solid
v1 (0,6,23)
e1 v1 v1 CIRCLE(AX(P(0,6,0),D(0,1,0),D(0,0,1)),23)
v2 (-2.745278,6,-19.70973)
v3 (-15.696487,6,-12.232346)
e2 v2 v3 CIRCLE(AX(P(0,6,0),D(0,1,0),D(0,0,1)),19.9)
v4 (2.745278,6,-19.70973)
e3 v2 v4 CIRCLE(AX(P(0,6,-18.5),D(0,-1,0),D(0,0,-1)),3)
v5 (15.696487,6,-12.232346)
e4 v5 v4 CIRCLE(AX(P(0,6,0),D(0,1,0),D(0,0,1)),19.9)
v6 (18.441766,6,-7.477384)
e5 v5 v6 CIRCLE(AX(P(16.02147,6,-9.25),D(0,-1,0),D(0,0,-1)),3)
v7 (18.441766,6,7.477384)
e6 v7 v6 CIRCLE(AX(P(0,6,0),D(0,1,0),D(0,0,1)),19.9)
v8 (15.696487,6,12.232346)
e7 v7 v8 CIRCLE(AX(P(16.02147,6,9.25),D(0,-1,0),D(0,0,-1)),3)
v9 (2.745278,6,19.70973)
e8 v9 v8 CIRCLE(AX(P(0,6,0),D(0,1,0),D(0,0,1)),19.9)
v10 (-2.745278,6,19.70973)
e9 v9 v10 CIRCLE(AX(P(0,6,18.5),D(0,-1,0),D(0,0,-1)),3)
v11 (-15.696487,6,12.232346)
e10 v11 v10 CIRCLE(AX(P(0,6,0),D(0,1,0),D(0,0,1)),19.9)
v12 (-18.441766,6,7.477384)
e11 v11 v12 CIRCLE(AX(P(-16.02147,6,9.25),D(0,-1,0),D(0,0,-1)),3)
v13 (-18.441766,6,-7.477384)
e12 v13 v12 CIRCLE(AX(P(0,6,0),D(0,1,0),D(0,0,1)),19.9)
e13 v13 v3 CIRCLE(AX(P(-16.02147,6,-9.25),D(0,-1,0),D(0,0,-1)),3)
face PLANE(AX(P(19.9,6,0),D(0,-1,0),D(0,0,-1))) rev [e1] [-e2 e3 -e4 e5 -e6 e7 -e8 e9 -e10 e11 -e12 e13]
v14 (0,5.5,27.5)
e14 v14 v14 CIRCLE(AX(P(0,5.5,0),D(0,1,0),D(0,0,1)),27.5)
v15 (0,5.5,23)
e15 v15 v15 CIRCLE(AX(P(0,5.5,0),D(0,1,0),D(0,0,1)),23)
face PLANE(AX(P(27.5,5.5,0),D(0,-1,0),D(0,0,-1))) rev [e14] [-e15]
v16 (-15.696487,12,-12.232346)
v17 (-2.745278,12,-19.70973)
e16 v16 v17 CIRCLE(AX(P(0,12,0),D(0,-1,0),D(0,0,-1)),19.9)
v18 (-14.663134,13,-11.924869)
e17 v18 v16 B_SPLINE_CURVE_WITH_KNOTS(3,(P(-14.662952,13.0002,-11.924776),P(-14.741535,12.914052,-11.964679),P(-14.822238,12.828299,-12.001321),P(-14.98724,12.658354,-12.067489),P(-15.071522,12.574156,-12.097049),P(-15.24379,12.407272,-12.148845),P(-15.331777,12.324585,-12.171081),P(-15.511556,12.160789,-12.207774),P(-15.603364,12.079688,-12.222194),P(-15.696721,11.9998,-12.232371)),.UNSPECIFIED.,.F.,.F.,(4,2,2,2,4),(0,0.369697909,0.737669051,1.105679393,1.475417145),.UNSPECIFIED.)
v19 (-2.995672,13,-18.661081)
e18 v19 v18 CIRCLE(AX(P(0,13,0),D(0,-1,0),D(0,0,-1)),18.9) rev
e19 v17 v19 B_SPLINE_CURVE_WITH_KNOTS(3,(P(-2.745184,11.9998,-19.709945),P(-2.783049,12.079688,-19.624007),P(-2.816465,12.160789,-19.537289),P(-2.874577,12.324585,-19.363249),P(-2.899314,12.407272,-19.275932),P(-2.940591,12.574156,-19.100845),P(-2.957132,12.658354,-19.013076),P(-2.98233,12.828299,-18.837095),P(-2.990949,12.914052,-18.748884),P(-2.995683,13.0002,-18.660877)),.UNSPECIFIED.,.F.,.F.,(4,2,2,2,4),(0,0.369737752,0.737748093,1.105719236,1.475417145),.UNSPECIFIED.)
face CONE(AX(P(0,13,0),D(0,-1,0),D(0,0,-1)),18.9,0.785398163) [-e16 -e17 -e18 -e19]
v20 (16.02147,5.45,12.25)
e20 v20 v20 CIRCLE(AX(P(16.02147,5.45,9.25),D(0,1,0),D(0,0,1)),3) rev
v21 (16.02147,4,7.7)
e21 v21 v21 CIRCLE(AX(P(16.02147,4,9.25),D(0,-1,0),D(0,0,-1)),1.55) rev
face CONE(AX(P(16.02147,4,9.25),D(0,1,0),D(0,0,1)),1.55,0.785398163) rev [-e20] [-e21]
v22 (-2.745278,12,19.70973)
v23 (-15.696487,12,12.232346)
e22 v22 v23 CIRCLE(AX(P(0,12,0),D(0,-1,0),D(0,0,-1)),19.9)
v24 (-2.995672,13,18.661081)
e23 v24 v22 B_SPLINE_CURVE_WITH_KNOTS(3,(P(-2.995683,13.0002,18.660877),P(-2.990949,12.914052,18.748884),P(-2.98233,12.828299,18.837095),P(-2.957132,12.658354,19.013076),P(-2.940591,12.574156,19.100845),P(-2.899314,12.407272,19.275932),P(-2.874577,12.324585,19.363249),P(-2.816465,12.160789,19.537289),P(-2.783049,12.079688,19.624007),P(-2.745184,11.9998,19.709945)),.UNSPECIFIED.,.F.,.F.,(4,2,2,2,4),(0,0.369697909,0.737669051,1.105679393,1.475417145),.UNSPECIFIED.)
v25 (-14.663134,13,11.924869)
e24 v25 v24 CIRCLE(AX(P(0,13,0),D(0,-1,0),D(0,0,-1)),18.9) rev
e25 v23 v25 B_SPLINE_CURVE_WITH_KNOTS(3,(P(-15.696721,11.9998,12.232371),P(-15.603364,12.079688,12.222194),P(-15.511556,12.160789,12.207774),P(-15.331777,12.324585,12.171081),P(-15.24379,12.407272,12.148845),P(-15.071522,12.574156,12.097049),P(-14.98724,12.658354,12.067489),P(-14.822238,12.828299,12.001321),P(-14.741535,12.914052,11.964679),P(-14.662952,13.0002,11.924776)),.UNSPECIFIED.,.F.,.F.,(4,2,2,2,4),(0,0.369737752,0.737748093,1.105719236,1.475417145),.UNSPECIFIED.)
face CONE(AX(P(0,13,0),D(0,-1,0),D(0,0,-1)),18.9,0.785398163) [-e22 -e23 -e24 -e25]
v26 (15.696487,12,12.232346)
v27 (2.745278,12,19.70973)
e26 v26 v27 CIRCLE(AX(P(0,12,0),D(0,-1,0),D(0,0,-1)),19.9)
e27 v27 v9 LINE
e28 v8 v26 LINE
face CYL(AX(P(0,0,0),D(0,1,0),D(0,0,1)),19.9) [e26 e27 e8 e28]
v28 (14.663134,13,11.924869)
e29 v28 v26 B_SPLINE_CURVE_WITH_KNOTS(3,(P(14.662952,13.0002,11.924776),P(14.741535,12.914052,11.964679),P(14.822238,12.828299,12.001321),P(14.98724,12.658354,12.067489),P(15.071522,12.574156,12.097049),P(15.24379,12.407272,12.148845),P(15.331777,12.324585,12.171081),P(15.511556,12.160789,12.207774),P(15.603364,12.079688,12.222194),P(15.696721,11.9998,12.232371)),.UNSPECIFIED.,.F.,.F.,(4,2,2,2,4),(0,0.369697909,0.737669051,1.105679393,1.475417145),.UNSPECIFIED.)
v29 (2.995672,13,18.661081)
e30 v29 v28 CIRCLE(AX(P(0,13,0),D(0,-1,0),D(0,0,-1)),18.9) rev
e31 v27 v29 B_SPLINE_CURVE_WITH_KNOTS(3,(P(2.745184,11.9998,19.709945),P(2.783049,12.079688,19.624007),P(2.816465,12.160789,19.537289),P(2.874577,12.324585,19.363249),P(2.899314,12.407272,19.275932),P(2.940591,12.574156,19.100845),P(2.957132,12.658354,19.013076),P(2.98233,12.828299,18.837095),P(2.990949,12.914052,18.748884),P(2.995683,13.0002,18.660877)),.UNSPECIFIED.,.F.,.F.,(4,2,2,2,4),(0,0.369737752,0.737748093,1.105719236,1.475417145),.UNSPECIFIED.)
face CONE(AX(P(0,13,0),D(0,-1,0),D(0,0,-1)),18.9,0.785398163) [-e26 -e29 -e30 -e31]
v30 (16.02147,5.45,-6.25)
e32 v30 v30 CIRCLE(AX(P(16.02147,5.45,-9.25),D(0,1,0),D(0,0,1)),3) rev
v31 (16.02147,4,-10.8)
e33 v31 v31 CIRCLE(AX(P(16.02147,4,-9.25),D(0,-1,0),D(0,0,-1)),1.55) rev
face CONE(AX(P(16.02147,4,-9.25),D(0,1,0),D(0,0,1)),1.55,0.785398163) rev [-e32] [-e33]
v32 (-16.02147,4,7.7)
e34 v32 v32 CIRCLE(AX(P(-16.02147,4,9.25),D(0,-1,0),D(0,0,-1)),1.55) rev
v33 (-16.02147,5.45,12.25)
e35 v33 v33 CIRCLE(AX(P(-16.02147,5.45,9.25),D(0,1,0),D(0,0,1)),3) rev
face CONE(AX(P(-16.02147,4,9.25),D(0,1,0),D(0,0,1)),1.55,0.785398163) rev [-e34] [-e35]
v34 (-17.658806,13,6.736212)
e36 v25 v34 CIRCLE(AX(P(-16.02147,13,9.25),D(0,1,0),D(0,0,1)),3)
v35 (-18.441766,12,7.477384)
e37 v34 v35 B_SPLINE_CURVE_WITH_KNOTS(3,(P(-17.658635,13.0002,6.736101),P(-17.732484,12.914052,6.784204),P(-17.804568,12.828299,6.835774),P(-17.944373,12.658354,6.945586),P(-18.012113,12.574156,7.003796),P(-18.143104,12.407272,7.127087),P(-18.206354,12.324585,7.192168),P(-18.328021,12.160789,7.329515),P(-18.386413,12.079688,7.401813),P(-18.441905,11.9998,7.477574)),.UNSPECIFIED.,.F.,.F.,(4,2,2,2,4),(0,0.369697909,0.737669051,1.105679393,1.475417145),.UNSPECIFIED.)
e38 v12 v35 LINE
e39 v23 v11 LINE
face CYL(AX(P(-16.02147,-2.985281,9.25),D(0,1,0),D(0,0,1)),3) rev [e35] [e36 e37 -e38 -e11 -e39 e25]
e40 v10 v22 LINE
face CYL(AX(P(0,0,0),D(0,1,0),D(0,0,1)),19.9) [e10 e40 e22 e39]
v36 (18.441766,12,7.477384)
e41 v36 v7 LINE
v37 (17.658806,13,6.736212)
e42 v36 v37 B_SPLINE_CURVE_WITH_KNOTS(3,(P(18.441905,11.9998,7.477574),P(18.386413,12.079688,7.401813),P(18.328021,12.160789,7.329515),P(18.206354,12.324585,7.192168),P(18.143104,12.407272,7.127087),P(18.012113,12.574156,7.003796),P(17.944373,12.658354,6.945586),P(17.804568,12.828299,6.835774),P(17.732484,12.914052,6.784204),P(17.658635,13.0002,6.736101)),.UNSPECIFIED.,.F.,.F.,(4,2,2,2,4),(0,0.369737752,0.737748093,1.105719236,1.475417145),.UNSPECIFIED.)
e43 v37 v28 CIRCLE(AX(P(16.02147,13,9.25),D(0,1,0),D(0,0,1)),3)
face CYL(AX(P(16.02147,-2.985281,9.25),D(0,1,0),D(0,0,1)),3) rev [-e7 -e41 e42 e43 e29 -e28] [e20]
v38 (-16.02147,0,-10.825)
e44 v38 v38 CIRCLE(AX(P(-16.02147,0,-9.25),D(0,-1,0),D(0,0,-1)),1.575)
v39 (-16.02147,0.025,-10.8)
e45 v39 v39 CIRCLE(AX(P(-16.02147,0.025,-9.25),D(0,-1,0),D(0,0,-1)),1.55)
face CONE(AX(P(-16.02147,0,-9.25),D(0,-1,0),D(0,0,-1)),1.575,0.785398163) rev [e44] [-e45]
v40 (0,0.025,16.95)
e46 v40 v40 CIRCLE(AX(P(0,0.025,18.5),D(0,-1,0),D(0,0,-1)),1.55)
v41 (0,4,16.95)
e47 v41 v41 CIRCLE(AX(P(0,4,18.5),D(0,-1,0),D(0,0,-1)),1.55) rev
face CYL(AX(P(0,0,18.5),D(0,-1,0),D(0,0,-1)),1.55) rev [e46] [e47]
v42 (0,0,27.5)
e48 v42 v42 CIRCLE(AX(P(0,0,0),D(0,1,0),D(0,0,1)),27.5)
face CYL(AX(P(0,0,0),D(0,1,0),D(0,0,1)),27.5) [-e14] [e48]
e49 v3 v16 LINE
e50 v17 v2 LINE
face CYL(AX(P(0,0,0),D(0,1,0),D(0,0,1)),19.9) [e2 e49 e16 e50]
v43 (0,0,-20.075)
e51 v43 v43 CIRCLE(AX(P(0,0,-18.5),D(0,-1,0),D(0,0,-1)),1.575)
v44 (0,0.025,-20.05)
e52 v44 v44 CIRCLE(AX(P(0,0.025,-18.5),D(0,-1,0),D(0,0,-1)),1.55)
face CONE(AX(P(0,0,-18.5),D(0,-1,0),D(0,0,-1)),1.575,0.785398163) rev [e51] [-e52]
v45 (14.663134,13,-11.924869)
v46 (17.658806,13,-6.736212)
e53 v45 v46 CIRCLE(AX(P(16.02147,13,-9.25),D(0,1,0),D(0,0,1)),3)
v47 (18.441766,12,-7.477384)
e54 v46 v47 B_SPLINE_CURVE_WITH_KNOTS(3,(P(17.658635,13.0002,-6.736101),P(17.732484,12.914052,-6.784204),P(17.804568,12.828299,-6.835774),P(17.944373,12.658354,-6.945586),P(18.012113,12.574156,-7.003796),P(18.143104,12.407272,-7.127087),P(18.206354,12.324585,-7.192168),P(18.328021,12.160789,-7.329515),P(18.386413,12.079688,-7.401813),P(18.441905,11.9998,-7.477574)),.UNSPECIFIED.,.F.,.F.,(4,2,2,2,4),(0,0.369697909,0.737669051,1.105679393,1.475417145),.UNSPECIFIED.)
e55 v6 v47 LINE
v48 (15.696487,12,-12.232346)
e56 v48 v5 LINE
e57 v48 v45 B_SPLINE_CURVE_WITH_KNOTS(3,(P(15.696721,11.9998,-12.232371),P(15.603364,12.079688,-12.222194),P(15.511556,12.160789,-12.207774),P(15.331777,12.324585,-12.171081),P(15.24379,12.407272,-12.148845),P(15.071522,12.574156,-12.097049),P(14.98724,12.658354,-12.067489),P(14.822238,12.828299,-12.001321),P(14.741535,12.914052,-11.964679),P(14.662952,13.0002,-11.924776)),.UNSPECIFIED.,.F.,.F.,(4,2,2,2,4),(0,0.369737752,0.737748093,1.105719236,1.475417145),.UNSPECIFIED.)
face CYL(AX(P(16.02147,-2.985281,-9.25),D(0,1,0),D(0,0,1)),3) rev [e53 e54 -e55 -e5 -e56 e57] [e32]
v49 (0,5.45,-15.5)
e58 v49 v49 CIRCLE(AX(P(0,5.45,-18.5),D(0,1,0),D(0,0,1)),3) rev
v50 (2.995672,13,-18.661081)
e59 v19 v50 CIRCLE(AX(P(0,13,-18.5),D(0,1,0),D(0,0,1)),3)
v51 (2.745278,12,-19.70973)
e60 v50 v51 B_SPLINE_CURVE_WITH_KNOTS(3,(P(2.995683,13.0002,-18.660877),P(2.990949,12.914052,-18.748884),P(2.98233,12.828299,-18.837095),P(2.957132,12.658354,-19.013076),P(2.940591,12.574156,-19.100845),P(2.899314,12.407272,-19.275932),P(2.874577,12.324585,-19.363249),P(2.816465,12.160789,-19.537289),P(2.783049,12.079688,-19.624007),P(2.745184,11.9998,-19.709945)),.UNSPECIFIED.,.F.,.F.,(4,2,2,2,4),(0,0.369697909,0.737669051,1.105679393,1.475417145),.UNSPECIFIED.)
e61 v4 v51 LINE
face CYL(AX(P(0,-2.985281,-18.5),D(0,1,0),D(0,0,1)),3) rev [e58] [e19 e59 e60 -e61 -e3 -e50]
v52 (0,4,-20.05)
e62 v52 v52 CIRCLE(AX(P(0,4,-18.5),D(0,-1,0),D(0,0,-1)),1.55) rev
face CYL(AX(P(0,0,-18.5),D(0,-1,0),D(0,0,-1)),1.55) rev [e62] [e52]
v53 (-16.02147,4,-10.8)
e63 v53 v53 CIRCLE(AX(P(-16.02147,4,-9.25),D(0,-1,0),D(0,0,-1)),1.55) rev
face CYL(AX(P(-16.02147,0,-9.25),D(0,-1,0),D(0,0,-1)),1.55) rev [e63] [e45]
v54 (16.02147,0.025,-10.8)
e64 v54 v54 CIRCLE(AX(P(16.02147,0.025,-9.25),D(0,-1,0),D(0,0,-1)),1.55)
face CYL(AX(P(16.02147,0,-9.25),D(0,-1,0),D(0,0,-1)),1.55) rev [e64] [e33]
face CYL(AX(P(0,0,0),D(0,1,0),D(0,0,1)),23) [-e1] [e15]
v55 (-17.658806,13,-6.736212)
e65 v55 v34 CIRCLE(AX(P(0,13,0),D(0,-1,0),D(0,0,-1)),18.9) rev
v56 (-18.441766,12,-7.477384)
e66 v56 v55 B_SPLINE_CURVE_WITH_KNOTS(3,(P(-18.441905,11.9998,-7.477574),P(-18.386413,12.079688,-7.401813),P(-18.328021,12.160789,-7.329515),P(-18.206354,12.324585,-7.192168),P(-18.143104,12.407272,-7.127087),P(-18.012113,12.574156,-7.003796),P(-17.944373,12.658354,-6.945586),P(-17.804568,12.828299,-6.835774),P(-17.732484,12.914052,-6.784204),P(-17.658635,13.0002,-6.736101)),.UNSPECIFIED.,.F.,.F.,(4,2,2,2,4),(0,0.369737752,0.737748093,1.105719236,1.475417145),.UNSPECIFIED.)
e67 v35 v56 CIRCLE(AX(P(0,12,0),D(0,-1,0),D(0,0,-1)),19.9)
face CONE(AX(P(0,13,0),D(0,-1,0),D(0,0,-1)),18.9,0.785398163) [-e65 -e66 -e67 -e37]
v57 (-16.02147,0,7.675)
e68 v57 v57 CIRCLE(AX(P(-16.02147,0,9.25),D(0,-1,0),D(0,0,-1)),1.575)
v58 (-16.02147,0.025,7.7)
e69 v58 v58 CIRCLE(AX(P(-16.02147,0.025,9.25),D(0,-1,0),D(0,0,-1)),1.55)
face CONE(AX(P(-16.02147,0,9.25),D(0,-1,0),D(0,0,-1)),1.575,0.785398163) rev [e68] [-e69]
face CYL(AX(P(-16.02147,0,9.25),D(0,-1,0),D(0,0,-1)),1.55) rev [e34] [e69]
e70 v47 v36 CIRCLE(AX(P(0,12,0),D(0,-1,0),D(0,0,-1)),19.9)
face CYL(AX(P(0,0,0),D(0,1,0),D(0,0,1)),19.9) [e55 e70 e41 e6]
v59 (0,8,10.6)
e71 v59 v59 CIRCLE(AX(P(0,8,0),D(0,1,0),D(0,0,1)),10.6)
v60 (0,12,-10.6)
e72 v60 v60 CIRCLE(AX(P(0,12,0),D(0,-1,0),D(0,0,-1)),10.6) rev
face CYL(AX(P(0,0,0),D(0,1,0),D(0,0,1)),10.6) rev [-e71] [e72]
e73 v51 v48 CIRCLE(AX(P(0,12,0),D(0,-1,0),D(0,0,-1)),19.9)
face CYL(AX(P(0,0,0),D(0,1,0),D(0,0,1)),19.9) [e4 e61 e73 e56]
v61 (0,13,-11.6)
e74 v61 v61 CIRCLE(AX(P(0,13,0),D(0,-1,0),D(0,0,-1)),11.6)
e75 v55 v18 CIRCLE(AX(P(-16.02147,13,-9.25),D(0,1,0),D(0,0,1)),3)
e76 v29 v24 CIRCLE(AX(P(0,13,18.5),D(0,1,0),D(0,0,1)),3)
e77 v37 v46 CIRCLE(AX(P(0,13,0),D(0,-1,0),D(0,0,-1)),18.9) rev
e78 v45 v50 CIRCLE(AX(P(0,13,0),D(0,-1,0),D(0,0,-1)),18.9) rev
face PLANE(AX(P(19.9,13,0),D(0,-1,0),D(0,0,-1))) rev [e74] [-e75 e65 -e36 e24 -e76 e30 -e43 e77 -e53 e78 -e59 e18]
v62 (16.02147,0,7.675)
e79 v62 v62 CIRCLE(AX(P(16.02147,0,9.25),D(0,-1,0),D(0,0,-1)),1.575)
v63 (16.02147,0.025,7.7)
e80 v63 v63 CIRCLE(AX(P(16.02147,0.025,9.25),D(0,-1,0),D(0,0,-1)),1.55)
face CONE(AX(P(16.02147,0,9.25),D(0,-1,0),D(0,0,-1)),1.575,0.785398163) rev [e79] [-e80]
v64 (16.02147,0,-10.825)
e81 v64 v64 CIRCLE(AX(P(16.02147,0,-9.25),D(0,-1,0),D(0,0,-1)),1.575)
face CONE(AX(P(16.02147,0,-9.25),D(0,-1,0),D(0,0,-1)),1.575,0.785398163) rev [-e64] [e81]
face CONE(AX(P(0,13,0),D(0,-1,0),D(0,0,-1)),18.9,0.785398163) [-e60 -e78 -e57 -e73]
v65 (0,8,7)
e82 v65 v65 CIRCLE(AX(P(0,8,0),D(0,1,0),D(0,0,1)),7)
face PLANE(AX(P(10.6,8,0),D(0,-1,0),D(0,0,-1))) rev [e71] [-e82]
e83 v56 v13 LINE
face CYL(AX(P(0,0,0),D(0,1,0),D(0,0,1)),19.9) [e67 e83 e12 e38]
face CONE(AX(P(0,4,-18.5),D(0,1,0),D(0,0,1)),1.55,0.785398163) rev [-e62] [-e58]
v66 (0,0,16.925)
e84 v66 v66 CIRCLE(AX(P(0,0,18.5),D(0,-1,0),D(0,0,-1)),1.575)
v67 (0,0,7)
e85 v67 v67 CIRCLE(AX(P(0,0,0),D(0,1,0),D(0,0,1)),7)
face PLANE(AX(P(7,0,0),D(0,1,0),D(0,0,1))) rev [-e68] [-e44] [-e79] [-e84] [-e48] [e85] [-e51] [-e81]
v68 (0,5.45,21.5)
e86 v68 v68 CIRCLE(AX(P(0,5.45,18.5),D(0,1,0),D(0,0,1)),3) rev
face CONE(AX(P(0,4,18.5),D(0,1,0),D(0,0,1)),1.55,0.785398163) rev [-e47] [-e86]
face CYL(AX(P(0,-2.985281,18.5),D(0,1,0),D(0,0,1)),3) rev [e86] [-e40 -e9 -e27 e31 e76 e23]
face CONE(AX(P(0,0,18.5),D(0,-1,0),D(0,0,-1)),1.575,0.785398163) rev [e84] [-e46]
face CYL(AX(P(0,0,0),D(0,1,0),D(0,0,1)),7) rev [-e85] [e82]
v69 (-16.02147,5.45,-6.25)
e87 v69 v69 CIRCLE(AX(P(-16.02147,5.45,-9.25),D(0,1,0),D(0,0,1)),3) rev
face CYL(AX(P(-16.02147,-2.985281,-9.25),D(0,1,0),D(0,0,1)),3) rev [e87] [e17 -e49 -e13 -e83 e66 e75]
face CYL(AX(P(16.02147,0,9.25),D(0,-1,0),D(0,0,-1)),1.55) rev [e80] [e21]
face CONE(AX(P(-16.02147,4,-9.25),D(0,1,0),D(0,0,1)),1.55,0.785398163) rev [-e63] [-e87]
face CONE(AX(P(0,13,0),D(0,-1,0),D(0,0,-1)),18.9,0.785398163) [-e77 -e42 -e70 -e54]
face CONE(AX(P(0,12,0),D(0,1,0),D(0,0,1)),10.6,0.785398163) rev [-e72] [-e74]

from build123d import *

# Parameters (mm, degrees)
FASE1_SIZE                                 = 1
F_3_1_3_1_DURCHMESSER_BOHRUNG1_D           = 3.1
F_3_1_3_1_DURCHMESSER_BOHRUNG1_DEPTH       = 15
F_3_1_3_1_DURCHMESSER_BOHRUNG1_CSINK_D     = 3.15
F_3_1_3_1_DURCHMESSER_BOHRUNG1_CSINK_ANGLE = 90
F_3_1_3_1_DURCHMESSER_BOHRUNG1_TIP         = 0.931333959
SCHNITT_LINEAR_AUSTRAGEN1_REACH            = 43.006
SKIZZE5_R                                  = 3
FASE2_SIZE                                 = 1.5


with BuildPart() as part:
    # Skizze1 → Rotation1 (revolve)
    with BuildSketch(Plane.XY, mode=Mode.PRIVATE) as rotation1_sk:
        Polygon((7, 0), (27.5, 0), (27.5, 5.5), (23, 5.5), (23, 6), (19.9, 6), (19.9, 13), (10.6, 13), (10.6, 8), (7, 8), align=None)
    revolve(rotation1_sk.sketch.rotate(Axis((0, 0, 0), (0, -1, 0)), 90), axis=Axis((0, 0, 0), (0, -1, 0)))

    # Fase1
    fase1_edges = [part.edges().sort_by_distance(p)[0] for p in [
        (0, 13, -19.9),
        (0, 13, -10.6),
    ]]
    chamfer(fase1_edges, length=FASE1_SIZE)

    # Ø3.1 (3.1) Durchmesser Bohrung1
    with Locations(Plane(origin=(0, 0, 0), x_dir=(-1, 0, 0), z_dir=(0, -1, 0))):
        with Locations((-16.02146997, 9.25), (0, 18.5), (16.02146997, 9.25), (16.02146997, -9.25), (0, -18.5), (-16.02146997, -9.25)):
            CounterSinkHole(F_3_1_3_1_DURCHMESSER_BOHRUNG1_D / 2, F_3_1_3_1_DURCHMESSER_BOHRUNG1_CSINK_D / 2, depth=F_3_1_3_1_DURCHMESSER_BOHRUNG1_DEPTH, counter_sink_angle=F_3_1_3_1_DURCHMESSER_BOHRUNG1_CSINK_ANGLE)
            with Locations((0, 0, -(F_3_1_3_1_DURCHMESSER_BOHRUNG1_DEPTH + F_3_1_3_1_DURCHMESSER_BOHRUNG1_TIP / 2))):  # 118° drill point
                Cone(0, F_3_1_3_1_DURCHMESSER_BOHRUNG1_D / 2, F_3_1_3_1_DURCHMESSER_BOHRUNG1_TIP, mode=Mode.SUBTRACT)

    # Schnitt-Linear austragen1: up to this face of the body (flat: up to its plane)
    schnitt_linear_austragen1_end = Plane(part.part.faces().sort_by_distance((0, 5.5, -26.722182541))[0])
    # Skizze5 → Schnitt-Linear austragen1 (cut, up to the picked face)
    with BuildSketch(Plane(origin=(0, 13, 0), x_dir=(1, 0, 0), z_dir=(0, 1, 0)), mode=Mode.PRIVATE) as schnitt_linear_austragen1_sk1:
        with Locations(Location((0, 18.5, 0), (0, 0, 3.077902124))):
            Circle(SKIZZE5_R)
    schnitt_linear_austragen1_tool1 = split(extrude(schnitt_linear_austragen1_sk1.sketch, amount=-SCHNITT_LINEAR_AUSTRAGEN1_REACH, mode=Mode.PRIVATE), bisect_by=schnitt_linear_austragen1_end, keep=Keep.BOTH, mode=Mode.PRIVATE)
    # Skizze5 → Schnitt-Linear austragen1 (cut, up to the picked face)
    with BuildSketch(Plane(origin=(0, 13, 0), x_dir=(1, 0, 0), z_dir=(0, 1, 0)), mode=Mode.PRIVATE) as schnitt_linear_austragen1_sk2:
        with Locations(Location((16.02146997, 9.25, 0), (0, 0, 303.077902124))):
            Circle(SKIZZE5_R)
    schnitt_linear_austragen1_tool2 = split(extrude(schnitt_linear_austragen1_sk2.sketch, amount=-SCHNITT_LINEAR_AUSTRAGEN1_REACH, mode=Mode.PRIVATE), bisect_by=schnitt_linear_austragen1_end, keep=Keep.BOTH, mode=Mode.PRIVATE)
    # Skizze5 → Schnitt-Linear austragen1 (cut, up to the picked face)
    with BuildSketch(Plane(origin=(0, 13, 0), x_dir=(1, 0, 0), z_dir=(0, 1, 0)), mode=Mode.PRIVATE) as schnitt_linear_austragen1_sk3:
        with Locations(Location((16.02146997, -9.25, 0), (0, 0, 263.781086479))):
            Circle(SKIZZE5_R)
    schnitt_linear_austragen1_tool3 = split(extrude(schnitt_linear_austragen1_sk3.sketch, amount=-SCHNITT_LINEAR_AUSTRAGEN1_REACH, mode=Mode.PRIVATE), bisect_by=schnitt_linear_austragen1_end, keep=Keep.BOTH, mode=Mode.PRIVATE)
    # Skizze5 → Schnitt-Linear austragen1 (cut, up to the picked face)
    with BuildSketch(Plane(origin=(0, 13, 0), x_dir=(1, 0, 0), z_dir=(0, 1, 0)), mode=Mode.PRIVATE) as schnitt_linear_austragen1_sk4:
        with Locations(Location((0, -18.5, 0), (0, 0, 336.2189135))):
            Circle(SKIZZE5_R)
    schnitt_linear_austragen1_tool4 = split(extrude(schnitt_linear_austragen1_sk4.sketch, amount=-SCHNITT_LINEAR_AUSTRAGEN1_REACH, mode=Mode.PRIVATE), bisect_by=schnitt_linear_austragen1_end, keep=Keep.BOTH, mode=Mode.PRIVATE)
    # Skizze5 → Schnitt-Linear austragen1 (cut, up to the picked face)
    with BuildSketch(Plane(origin=(0, 13, 0), x_dir=(1, 0, 0), z_dir=(0, 1, 0)), mode=Mode.PRIVATE) as schnitt_linear_austragen1_sk5:
        with Locations(Location((-16.02146997, -9.25, 0), (0, 0, 276.2189135))):
            Circle(SKIZZE5_R)
    schnitt_linear_austragen1_tool5 = split(extrude(schnitt_linear_austragen1_sk5.sketch, amount=-SCHNITT_LINEAR_AUSTRAGEN1_REACH, mode=Mode.PRIVATE), bisect_by=schnitt_linear_austragen1_end, keep=Keep.BOTH, mode=Mode.PRIVATE)
    # Skizze5 → Schnitt-Linear austragen1 (cut, up to the picked face)
    with BuildSketch(Plane(origin=(0, 13, 0), x_dir=(1, 0, 0), z_dir=(0, 1, 0)), mode=Mode.PRIVATE) as schnitt_linear_austragen1_sk6:
        with Locations(Location((-16.02146997, 9.25, 0), (0, 0, 236.922097816))):
            Circle(SKIZZE5_R)
    schnitt_linear_austragen1_tool6 = split(extrude(schnitt_linear_austragen1_sk6.sketch, amount=-SCHNITT_LINEAR_AUSTRAGEN1_REACH, mode=Mode.PRIVATE), bisect_by=schnitt_linear_austragen1_end, keep=Keep.BOTH, mode=Mode.PRIVATE)
    add(schnitt_linear_austragen1_tool1.solids().sort_by(Axis((0, 13, -18.5), (0, -1, 0)))[0], mode=Mode.SUBTRACT)
    add(schnitt_linear_austragen1_tool2.solids().sort_by(Axis((16.02147, 13, -9.25), (0, -1, 0)))[0], mode=Mode.SUBTRACT)
    add(schnitt_linear_austragen1_tool3.solids().sort_by(Axis((16.02147, 13, 9.25), (0, -1, 0)))[0], mode=Mode.SUBTRACT)
    add(schnitt_linear_austragen1_tool4.solids().sort_by(Axis((0, 13, 18.5), (0, -1, 0)))[0], mode=Mode.SUBTRACT)
    add(schnitt_linear_austragen1_tool5.solids().sort_by(Axis((-16.02147, 13, 9.25), (0, -1, 0)))[0], mode=Mode.SUBTRACT)
    add(schnitt_linear_austragen1_tool6.solids().sort_by(Axis((-16.02147, 13, -9.25), (0, -1, 0)))[0], mode=Mode.SUBTRACT)

    # Fase2
    # the kernel refuses this chamfer: 1.5 mm, written as the material it takes off along each edge
    with BuildSketch(Plane(origin=(0, 5.5, -18.5), x_dir=(1, 0, 0), z_dir=(0, 0, 1))) as fase2_piece_1_section:
        Polygon((1.55 + FASE2_SIZE, 0), (1.55, -FASE2_SIZE), (1.55, 0), align=None)
    fase2_piece_1 = revolve(axis=Axis((0, 5.5, -18.5), (0, 1, 0)), mode=Mode.PRIVATE)
    fase2_piece_1 = fase2_piece_1 & Plane(origin=(0, 4.721521587, -18.5), x_dir=(0.9985574532138488, 0, -0.053693692656328715), z_dir=(0, 1, 0)) * Cylinder(3, 13, mode=Mode.PRIVATE)
    add(fase2_piece_1, mode=Mode.SUBTRACT)
    with BuildSketch(Plane(origin=(16.02146997, 5.5, -9.25), x_dir=(1, 0, 0), z_dir=(0, 0, 1))) as fase2_piece_2_section:
        Polygon((1.55 + FASE2_SIZE, 0), (1.55, -FASE2_SIZE), (1.55, 0), align=None)
    fase2_piece_2 = revolve(axis=Axis((16.02146997, 5.5, -9.25), (0, 1, 0)), mode=Mode.PRIVATE)
    fase2_piece_2 = fase2_piece_2 & Plane(origin=(16.02146997, 4.721521587, -9.25), x_dir=(0.5457788284702986, 0, 0.83792927529332), z_dir=(0, 1, 0)) * Cylinder(3, 13, mode=Mode.PRIVATE)
    add(fase2_piece_2, mode=Mode.SUBTRACT)
    with BuildSketch(Plane(origin=(16.02146997, 5.5, 9.25), x_dir=(1, 0, 0), z_dir=(0, 0, 1))) as fase2_piece_3_section:
        Polygon((1.55 + FASE2_SIZE, 0), (1.55, -FASE2_SIZE), (1.55, 0), align=None)
    fase2_piece_3 = revolve(axis=Axis((16.02146997, 5.5, 9.25), (0, 1, 0)), mode=Mode.PRIVATE)
    fase2_piece_3 = fase2_piece_3 & Plane(origin=(16.02146997, 4.721521587, 9.25), x_dir=(-0.10832752224481851, 0, 0.9941152588730838), z_dir=(0, 1, 0)) * Cylinder(3, 13, mode=Mode.PRIVATE)
    add(fase2_piece_3, mode=Mode.SUBTRACT)
    with BuildSketch(Plane(origin=(0, 5.5, 18.5), x_dir=(1, 0, 0), z_dir=(0, 0, 1))) as fase2_piece_4_section:
        Polygon((1.55 + FASE2_SIZE, 0), (1.55, -FASE2_SIZE), (1.55, 0), align=None)
    fase2_piece_4 = revolve(axis=Axis((0, 5.5, 18.5), (0, 1, 0)), mode=Mode.PRIVATE)
    fase2_piece_4 = fase2_piece_4 & Plane(origin=(0, 4.721521587, 18.5), x_dir=(0.915092829448447, 0, 0.4032432435789042), z_dir=(0, 1, 0)) * Cylinder(3, 13, mode=Mode.PRIVATE)
    add(fase2_piece_4, mode=Mode.SUBTRACT)
    with BuildSketch(Plane(origin=(-16.02146997, 5.5, -9.25), x_dir=(1, 0, 0), z_dir=(0, 0, 1))) as fase2_piece_5_section:
        Polygon((1.55 + FASE2_SIZE, 0), (1.55, -FASE2_SIZE), (1.55, 0), align=None)
    fase2_piece_5 = revolve(axis=Axis((-16.02146997, 5.5, -9.25), (0, 1, 0)), mode=Mode.PRIVATE)
    fase2_piece_5 = fase2_piece_5 & Plane(origin=(-16.02146997, 4.721521587, -9.25), x_dir=(-0.5457788293477767, 0, 0.8379292747217814), z_dir=(0, 1, 0)) * Cylinder(3, 13, mode=Mode.PRIVATE)
    add(fase2_piece_5, mode=Mode.SUBTRACT)
    with BuildSketch(Plane(origin=(-16.02146997, 5.5, 9.25), x_dir=(1, 0, 0), z_dir=(0, 0, 1))) as fase2_piece_6_section:
        Polygon((1.55 + FASE2_SIZE, 0), (1.55, -FASE2_SIZE), (1.55, 0), align=None)
    fase2_piece_6 = revolve(axis=Axis((-16.02146997, 5.5, 9.25), (0, 1, 0)), mode=Mode.PRIVATE)
    fase2_piece_6 = fase2_piece_6 & Plane(origin=(-16.02146997, 4.721521587, 9.25), x_dir=(0.10832752188045662, 0, 0.9941152589127878), z_dir=(0, 1, 0)) * Cylinder(3, 13, mode=Mode.PRIVATE)
    add(fase2_piece_6, mode=Mode.SUBTRACT)


solid = part.part
